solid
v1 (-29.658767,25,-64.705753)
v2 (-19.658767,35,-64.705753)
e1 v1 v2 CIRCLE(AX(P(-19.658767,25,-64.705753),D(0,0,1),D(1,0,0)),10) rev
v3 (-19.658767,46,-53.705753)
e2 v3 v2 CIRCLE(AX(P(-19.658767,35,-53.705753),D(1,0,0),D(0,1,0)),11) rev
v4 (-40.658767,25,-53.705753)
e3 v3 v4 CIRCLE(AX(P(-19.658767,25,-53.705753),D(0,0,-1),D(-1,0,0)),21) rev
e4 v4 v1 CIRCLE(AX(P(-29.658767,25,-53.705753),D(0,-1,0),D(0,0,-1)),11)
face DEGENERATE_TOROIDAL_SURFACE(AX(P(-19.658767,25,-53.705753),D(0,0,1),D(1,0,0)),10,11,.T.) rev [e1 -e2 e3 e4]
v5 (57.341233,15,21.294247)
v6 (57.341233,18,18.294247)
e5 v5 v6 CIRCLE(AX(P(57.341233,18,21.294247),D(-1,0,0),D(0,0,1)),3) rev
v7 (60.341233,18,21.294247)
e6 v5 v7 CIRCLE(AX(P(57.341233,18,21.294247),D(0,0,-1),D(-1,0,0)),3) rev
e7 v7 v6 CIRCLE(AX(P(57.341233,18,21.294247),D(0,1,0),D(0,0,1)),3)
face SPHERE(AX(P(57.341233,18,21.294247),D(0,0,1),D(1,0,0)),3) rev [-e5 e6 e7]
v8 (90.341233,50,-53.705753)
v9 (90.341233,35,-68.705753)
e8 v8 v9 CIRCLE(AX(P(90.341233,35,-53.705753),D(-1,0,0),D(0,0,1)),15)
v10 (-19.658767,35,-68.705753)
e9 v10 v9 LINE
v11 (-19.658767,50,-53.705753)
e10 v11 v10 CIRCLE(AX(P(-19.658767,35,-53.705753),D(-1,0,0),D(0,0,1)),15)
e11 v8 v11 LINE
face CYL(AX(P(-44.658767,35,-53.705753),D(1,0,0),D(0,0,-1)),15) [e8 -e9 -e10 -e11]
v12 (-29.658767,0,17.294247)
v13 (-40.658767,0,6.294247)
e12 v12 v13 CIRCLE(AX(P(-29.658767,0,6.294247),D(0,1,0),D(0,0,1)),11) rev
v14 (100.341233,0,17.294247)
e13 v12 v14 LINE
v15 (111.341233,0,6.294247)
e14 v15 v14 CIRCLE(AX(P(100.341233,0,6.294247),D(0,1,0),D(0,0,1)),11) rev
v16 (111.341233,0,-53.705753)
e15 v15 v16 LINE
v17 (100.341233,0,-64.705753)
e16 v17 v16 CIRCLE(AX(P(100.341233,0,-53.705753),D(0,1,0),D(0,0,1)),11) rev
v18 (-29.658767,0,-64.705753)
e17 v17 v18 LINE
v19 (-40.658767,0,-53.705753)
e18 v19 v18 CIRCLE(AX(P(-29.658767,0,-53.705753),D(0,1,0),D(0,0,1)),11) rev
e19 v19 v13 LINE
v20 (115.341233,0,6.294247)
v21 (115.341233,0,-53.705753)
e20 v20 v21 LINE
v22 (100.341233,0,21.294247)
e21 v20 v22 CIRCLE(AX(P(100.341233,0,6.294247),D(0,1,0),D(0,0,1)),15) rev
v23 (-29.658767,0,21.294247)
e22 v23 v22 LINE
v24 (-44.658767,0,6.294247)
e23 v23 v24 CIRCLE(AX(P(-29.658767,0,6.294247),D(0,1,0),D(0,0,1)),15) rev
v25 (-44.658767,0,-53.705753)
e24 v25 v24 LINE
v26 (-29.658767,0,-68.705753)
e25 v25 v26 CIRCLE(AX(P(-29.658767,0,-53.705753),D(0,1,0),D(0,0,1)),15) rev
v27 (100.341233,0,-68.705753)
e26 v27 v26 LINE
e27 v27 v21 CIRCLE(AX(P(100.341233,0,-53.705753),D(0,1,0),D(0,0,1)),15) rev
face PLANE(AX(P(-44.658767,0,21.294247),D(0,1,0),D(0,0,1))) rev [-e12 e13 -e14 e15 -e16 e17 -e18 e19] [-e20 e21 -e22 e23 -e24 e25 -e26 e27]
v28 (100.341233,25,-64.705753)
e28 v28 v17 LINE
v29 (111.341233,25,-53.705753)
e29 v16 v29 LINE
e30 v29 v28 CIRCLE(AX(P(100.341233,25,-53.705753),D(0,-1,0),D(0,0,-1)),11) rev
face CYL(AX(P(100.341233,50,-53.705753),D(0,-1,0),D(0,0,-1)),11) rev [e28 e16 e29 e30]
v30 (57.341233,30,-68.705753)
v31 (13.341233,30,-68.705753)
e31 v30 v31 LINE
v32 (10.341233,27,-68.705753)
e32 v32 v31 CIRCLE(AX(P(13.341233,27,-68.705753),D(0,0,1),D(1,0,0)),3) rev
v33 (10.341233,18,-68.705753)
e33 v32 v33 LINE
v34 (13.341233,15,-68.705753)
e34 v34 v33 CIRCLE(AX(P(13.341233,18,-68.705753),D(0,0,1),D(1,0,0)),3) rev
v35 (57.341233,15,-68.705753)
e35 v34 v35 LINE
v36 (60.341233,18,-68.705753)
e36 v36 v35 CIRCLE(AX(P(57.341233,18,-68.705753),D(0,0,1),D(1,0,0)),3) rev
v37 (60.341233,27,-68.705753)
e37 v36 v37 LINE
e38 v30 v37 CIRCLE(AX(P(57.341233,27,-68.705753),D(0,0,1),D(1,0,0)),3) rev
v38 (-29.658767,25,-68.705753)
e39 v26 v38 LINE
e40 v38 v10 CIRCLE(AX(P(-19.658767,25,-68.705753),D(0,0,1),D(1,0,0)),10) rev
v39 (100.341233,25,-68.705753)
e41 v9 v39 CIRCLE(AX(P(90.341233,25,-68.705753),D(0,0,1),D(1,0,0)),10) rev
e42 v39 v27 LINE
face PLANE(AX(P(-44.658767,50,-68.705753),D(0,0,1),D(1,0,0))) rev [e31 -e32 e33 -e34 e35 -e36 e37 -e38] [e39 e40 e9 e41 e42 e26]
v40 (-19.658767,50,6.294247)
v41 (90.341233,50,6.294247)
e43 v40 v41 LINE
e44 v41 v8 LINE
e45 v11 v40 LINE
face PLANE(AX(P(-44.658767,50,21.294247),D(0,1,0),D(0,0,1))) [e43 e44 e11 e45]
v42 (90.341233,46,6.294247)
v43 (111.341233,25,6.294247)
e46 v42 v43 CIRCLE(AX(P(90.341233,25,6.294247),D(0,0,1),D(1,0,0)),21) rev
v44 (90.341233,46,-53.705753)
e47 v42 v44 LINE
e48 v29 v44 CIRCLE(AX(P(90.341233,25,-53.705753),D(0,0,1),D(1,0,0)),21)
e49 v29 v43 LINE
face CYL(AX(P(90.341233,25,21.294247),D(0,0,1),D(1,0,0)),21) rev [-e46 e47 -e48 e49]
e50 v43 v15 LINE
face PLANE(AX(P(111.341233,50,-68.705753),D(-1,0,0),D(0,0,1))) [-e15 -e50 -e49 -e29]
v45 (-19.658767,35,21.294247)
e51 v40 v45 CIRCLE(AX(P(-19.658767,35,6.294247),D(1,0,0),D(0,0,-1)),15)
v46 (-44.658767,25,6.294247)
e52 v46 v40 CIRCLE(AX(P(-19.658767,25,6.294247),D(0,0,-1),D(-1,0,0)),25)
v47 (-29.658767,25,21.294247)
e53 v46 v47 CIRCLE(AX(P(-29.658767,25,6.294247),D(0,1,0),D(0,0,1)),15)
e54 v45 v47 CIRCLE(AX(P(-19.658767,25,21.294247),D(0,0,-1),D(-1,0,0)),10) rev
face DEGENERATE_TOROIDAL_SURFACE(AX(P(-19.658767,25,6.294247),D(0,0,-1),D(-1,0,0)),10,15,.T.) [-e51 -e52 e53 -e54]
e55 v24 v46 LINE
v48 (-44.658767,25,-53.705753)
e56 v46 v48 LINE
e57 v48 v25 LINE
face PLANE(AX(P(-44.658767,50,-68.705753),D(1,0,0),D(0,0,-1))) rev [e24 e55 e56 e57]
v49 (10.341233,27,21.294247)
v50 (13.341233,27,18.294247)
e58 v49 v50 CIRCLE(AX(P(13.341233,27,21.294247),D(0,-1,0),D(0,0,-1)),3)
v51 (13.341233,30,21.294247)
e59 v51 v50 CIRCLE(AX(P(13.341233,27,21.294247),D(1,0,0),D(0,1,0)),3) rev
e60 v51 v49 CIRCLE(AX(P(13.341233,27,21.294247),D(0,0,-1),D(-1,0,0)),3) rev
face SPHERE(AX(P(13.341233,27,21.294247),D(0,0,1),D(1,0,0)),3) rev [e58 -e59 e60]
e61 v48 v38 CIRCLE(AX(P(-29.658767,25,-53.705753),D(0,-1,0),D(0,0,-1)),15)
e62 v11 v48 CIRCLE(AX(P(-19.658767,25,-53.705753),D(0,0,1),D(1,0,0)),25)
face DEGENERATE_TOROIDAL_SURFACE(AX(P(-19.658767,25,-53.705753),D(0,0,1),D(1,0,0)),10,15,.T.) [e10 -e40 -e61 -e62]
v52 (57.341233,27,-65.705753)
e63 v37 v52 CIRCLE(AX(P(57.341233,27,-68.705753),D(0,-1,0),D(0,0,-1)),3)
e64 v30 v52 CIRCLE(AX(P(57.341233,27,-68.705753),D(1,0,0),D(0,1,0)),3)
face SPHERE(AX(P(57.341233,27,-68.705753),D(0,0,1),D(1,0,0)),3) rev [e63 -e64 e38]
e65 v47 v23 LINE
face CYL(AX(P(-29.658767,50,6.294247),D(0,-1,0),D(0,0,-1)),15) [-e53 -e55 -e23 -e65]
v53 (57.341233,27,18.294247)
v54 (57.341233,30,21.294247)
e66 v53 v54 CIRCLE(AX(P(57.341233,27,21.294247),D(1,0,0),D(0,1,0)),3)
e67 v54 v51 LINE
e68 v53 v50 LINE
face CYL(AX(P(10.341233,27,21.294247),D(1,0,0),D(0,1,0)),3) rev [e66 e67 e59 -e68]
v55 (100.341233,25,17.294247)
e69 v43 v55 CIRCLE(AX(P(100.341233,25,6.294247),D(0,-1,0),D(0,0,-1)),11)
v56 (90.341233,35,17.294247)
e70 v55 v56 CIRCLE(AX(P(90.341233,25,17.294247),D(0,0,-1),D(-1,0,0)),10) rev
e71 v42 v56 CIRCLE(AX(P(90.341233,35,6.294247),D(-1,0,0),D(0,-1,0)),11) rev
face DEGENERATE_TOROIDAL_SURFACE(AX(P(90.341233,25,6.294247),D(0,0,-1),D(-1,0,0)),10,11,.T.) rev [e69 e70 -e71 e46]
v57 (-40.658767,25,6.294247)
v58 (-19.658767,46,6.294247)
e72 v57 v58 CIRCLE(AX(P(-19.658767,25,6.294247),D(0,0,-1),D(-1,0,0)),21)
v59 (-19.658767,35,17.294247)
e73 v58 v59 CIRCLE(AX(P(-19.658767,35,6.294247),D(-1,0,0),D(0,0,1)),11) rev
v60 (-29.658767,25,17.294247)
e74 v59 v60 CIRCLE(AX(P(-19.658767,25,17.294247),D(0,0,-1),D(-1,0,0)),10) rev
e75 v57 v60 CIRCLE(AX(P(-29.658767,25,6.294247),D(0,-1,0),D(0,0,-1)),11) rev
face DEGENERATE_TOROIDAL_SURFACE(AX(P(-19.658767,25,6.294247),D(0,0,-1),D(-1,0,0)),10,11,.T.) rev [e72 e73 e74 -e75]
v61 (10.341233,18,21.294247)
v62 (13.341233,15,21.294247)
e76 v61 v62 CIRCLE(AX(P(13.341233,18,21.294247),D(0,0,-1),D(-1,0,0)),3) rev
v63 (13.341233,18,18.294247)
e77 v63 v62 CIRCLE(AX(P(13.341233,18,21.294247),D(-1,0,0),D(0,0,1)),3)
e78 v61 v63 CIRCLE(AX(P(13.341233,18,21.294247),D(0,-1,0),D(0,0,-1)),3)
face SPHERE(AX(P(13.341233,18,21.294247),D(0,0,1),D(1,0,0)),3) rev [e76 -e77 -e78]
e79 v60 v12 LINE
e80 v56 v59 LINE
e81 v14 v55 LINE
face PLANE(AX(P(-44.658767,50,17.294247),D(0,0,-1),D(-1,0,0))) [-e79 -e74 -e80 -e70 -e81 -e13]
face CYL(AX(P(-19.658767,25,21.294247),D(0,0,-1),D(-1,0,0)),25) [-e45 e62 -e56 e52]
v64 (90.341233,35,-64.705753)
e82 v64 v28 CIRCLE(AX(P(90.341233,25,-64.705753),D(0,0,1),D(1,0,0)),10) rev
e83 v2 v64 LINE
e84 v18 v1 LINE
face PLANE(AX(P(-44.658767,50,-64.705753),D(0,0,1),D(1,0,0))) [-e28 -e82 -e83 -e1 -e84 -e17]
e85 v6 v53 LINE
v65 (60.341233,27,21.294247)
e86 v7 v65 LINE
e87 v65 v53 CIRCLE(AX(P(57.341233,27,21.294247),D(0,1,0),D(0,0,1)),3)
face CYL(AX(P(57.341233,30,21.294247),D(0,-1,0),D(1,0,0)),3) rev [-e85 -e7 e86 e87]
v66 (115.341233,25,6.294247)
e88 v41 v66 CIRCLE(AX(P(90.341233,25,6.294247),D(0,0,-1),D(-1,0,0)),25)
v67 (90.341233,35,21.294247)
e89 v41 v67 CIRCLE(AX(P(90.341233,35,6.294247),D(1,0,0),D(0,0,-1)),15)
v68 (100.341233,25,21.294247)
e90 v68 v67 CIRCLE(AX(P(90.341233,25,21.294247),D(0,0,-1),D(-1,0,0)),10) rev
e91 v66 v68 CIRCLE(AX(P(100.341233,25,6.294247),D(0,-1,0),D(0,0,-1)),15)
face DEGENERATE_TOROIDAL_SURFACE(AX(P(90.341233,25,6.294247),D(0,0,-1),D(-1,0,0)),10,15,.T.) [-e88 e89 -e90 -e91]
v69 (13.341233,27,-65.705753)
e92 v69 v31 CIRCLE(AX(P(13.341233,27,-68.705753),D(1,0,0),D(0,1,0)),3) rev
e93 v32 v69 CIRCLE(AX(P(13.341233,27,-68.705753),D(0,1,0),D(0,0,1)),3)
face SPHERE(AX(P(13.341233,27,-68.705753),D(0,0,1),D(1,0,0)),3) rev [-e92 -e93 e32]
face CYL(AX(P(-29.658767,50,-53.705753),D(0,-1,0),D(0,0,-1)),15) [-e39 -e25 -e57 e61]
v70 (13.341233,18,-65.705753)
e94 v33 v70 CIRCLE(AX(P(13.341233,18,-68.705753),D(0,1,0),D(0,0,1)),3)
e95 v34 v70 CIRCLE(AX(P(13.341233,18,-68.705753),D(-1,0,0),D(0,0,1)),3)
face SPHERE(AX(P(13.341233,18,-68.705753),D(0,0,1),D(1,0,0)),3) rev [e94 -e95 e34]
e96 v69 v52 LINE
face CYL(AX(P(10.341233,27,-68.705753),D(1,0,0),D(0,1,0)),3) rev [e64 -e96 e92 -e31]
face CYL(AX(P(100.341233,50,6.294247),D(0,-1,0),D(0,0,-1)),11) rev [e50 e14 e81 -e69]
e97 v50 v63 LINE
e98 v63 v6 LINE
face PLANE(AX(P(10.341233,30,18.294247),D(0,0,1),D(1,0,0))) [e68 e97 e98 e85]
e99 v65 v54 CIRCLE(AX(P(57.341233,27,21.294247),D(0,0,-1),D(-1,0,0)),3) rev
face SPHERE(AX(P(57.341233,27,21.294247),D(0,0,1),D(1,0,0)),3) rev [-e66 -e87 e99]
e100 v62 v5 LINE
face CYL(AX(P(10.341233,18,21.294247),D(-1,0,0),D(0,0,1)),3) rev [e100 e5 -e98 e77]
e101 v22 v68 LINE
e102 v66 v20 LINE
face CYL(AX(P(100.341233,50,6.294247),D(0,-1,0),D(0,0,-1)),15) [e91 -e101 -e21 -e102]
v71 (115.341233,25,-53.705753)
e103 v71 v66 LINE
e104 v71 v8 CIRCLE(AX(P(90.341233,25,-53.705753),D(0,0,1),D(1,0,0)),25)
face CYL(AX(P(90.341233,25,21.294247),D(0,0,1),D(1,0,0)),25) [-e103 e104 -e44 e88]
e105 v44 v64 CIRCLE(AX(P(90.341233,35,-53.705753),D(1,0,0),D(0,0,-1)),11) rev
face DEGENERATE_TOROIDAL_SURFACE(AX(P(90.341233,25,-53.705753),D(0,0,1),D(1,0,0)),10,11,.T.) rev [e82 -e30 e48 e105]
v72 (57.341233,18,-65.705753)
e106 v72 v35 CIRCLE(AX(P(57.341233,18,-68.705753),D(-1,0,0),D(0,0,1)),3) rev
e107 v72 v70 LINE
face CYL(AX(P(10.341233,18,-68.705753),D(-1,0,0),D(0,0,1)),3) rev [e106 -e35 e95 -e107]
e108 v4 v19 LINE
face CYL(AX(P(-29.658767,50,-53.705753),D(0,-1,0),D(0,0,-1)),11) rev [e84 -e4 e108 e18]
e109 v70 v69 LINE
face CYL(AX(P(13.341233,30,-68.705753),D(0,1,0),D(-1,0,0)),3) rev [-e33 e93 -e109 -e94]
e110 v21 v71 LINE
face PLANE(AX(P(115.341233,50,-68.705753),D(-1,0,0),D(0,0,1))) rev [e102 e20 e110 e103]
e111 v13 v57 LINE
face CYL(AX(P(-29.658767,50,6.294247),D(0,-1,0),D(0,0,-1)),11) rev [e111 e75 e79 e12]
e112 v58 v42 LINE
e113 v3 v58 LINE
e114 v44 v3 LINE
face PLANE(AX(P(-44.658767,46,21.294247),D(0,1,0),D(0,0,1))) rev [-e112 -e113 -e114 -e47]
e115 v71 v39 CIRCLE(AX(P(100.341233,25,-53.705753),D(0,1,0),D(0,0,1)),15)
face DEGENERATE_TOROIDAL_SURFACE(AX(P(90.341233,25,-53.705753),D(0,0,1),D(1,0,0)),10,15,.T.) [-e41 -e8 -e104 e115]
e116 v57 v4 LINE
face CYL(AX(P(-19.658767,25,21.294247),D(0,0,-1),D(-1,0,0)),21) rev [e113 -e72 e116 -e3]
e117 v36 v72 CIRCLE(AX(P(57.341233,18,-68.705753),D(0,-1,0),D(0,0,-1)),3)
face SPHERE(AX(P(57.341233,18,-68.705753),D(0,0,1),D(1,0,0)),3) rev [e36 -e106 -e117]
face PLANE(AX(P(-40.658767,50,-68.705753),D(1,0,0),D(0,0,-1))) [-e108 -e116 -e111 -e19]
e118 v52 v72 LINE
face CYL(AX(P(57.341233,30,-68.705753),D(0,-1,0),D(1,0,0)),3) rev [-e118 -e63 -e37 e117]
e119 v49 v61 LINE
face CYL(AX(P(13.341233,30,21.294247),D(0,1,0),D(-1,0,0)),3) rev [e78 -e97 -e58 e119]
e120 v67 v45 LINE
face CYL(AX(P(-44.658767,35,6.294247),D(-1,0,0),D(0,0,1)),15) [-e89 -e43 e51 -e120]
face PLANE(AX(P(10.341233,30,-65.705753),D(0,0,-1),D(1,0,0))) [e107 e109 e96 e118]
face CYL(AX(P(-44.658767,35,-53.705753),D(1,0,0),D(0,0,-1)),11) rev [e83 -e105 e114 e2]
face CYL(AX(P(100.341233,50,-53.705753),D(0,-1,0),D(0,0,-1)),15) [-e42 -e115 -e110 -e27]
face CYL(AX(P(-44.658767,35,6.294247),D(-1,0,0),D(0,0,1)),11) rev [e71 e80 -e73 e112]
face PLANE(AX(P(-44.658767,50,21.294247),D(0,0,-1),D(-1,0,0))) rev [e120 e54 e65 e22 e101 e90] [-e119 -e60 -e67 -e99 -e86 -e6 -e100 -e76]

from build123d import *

# Parameters (mm, degrees)
ESQUISSE1_W             = 160
ESQUISSE1_H             = 90
EXTRUSION1_DEPTH        = 50
CONG_1_R                = 25
CONG_2_R                = 15
COQUE1_T                = -4
ESQUISSE2_W             = 50
ESQUISSE2_H             = 15
ENL_V_MAT_EXTRU_1_DEPTH = 3
CONG_4_R                = 3
CONG_5_R                = 3
CONG_6_R                = 3
CONG_7_R                = 3
CONG_4_OF_SYM_TRIE1_R   = 3
CONG_5_OF_SYM_TRIE1_R   = 3
CONG_6_OF_SYM_TRIE1_R   = 3
CONG_7_OF_SYM_TRIE1_R   = 3


with BuildPart() as part:
    # Esquisse1 → Extrusion1 (new body)
    with BuildSketch(Plane(origin=(0, 0, 0), x_dir=(1, 0, 0), z_dir=(0, 1, 0))):
        with Locations((35.341232877, 23.705753425)):
            Rectangle(ESQUISSE1_W, ESQUISSE1_H)
    extrude(amount=EXTRUSION1_DEPTH)

    # Congé1
    cong_1_edges = [part.edges().sort_by_distance(p)[0] for p in [
        (115.341232877, 50, -23.705753425),
        (-44.658767123, 50, -23.705753425),
    ]]
    fillet(cong_1_edges, radius=CONG_1_R)

    # Congé2
    cong_2_edges = [part.edges().sort_by_distance(p)[0] for p in [
        (35.341232877, 50, 21.294246575),
        (35.341232877, 50, -68.705753425),
        (115.341232877, 12.5, 21.294246575),
        (-44.658767123, 12.5, 21.294246575),
        (108.018902406, 42.67766953, 21.294246575),
        (-37.336436653, 42.67766953, 21.294246575),
        (-44.658767123, 12.5, -68.705753425),
        (115.341232877, 12.5, -68.705753425),
        (108.018902406, 42.67766953, -68.705753425),
        (-37.336436653, 42.67766953, -68.705753425),
    ]]
    fillet(cong_2_edges, radius=CONG_2_R)

    # Coque1
    coque1_openings = [part.faces().sort_by_distance(p)[0] for p in [
        (35.341232877, 0, -23.705753425),
    ]]
    offset(amount=COQUE1_T, openings=coque1_openings, kind=Kind.INTERSECTION)

    # Esquisse2 → Enlèv. mat.-Extru.1 (cut)
    with BuildSketch(Plane.XY.offset(21.294246575)):
        with Locations((35.341232877, 22.5)):
            Rectangle(ESQUISSE2_W, ESQUISSE2_H)
    enl_v_mat_extru_1 = extrude(amount=-ENL_V_MAT_EXTRU_1_DEPTH, mode=Mode.SUBTRACT)

    # Congé4
    cong_4_edges = [part.edges().sort_by_distance(p)[0] for p in [
        (35.341232877, 15, 18.294246575),
    ]]
    fillet(cong_4_edges, radius=CONG_4_R - 0.0001)  # a hair under: the kernel refuses the full size

    # Congé5
    cong_5_edges = [part.edges().sort_by_distance(p)[0] for p in [
        (35.341232877, 30, 18.294246575),
    ]]
    fillet(cong_5_edges, radius=CONG_5_R - 0.0001)  # a hair under: the kernel refuses the full size

    # Congé6
    cong_6_edges = [part.edges().sort_by_distance(p)[0] for p in [
        (10.341232877, 15.878650367, 19.172896942),
        (10.341232877, 22.5, 18.294246575),
        (10.341232877, 29.121349633, 19.172896942),
    ]]
    fillet(cong_6_edges, radius=CONG_6_R - 0.0001)  # a hair under: the kernel refuses the full size

    # Congé7
    cong_7_edges = [part.edges().sort_by_distance(p)[0] for p in [
        (60.341232877, 22.5, 18.294246575),
        (60.341232877, 15.878650367, 19.172896942),
        (60.341232877, 29.121349633, 19.172896942),
    ]]
    fillet(cong_7_edges, radius=CONG_7_R - 0.0001)  # a hair under: the kernel refuses the full size

    # Symétrie1: Enlèv. mat.-Extru.1 across plane
    add(enl_v_mat_extru_1.mirror(Plane.XY.offset(-23.705753425)), mode=Mode.SUBTRACT)

    # Congé4 of Symétrie1
    cong_4_of_sym_trie1_edges = [part.edges().sort_by_distance(p)[0] for p in [
        (35.341232877, 15, -65.705753425),
    ]]
    fillet(cong_4_of_sym_trie1_edges, radius=CONG_4_OF_SYM_TRIE1_R - 0.0001)  # a hair under: the kernel refuses the full size

    # Congé5 of Symétrie1
    cong_5_of_sym_trie1_edges = [part.edges().sort_by_distance(p)[0] for p in [
        (35.341232877, 30, -65.705753425),
    ]]
    fillet(cong_5_of_sym_trie1_edges, radius=CONG_5_OF_SYM_TRIE1_R - 0.0001)  # a hair under: the kernel refuses the full size

    # Congé6 of Symétrie1
    cong_6_of_sym_trie1_edges = [part.edges().sort_by_distance(p)[0] for p in [
        (10.341232877, 15.878650367, -66.584403792),
        (10.341232877, 22.5, -65.705753425),
        (10.341232877, 29.121349633, -66.584403792),
    ]]
    fillet(cong_6_of_sym_trie1_edges, radius=CONG_6_OF_SYM_TRIE1_R - 0.0001)  # a hair under: the kernel refuses the full size

    # Congé7 of Symétrie1
    cong_7_of_sym_trie1_edges = [part.edges().sort_by_distance(p)[0] for p in [
        (60.341232877, 22.5, -65.705753425),
        (60.341232877, 15.878650367, -66.584403792),
        (60.341232877, 29.121349633, -66.584403792),
    ]]
    fillet(cong_7_of_sym_trie1_edges, radius=CONG_7_OF_SYM_TRIE1_R - 0.0001)  # a hair under: the kernel refuses the full size


solid = part.part
